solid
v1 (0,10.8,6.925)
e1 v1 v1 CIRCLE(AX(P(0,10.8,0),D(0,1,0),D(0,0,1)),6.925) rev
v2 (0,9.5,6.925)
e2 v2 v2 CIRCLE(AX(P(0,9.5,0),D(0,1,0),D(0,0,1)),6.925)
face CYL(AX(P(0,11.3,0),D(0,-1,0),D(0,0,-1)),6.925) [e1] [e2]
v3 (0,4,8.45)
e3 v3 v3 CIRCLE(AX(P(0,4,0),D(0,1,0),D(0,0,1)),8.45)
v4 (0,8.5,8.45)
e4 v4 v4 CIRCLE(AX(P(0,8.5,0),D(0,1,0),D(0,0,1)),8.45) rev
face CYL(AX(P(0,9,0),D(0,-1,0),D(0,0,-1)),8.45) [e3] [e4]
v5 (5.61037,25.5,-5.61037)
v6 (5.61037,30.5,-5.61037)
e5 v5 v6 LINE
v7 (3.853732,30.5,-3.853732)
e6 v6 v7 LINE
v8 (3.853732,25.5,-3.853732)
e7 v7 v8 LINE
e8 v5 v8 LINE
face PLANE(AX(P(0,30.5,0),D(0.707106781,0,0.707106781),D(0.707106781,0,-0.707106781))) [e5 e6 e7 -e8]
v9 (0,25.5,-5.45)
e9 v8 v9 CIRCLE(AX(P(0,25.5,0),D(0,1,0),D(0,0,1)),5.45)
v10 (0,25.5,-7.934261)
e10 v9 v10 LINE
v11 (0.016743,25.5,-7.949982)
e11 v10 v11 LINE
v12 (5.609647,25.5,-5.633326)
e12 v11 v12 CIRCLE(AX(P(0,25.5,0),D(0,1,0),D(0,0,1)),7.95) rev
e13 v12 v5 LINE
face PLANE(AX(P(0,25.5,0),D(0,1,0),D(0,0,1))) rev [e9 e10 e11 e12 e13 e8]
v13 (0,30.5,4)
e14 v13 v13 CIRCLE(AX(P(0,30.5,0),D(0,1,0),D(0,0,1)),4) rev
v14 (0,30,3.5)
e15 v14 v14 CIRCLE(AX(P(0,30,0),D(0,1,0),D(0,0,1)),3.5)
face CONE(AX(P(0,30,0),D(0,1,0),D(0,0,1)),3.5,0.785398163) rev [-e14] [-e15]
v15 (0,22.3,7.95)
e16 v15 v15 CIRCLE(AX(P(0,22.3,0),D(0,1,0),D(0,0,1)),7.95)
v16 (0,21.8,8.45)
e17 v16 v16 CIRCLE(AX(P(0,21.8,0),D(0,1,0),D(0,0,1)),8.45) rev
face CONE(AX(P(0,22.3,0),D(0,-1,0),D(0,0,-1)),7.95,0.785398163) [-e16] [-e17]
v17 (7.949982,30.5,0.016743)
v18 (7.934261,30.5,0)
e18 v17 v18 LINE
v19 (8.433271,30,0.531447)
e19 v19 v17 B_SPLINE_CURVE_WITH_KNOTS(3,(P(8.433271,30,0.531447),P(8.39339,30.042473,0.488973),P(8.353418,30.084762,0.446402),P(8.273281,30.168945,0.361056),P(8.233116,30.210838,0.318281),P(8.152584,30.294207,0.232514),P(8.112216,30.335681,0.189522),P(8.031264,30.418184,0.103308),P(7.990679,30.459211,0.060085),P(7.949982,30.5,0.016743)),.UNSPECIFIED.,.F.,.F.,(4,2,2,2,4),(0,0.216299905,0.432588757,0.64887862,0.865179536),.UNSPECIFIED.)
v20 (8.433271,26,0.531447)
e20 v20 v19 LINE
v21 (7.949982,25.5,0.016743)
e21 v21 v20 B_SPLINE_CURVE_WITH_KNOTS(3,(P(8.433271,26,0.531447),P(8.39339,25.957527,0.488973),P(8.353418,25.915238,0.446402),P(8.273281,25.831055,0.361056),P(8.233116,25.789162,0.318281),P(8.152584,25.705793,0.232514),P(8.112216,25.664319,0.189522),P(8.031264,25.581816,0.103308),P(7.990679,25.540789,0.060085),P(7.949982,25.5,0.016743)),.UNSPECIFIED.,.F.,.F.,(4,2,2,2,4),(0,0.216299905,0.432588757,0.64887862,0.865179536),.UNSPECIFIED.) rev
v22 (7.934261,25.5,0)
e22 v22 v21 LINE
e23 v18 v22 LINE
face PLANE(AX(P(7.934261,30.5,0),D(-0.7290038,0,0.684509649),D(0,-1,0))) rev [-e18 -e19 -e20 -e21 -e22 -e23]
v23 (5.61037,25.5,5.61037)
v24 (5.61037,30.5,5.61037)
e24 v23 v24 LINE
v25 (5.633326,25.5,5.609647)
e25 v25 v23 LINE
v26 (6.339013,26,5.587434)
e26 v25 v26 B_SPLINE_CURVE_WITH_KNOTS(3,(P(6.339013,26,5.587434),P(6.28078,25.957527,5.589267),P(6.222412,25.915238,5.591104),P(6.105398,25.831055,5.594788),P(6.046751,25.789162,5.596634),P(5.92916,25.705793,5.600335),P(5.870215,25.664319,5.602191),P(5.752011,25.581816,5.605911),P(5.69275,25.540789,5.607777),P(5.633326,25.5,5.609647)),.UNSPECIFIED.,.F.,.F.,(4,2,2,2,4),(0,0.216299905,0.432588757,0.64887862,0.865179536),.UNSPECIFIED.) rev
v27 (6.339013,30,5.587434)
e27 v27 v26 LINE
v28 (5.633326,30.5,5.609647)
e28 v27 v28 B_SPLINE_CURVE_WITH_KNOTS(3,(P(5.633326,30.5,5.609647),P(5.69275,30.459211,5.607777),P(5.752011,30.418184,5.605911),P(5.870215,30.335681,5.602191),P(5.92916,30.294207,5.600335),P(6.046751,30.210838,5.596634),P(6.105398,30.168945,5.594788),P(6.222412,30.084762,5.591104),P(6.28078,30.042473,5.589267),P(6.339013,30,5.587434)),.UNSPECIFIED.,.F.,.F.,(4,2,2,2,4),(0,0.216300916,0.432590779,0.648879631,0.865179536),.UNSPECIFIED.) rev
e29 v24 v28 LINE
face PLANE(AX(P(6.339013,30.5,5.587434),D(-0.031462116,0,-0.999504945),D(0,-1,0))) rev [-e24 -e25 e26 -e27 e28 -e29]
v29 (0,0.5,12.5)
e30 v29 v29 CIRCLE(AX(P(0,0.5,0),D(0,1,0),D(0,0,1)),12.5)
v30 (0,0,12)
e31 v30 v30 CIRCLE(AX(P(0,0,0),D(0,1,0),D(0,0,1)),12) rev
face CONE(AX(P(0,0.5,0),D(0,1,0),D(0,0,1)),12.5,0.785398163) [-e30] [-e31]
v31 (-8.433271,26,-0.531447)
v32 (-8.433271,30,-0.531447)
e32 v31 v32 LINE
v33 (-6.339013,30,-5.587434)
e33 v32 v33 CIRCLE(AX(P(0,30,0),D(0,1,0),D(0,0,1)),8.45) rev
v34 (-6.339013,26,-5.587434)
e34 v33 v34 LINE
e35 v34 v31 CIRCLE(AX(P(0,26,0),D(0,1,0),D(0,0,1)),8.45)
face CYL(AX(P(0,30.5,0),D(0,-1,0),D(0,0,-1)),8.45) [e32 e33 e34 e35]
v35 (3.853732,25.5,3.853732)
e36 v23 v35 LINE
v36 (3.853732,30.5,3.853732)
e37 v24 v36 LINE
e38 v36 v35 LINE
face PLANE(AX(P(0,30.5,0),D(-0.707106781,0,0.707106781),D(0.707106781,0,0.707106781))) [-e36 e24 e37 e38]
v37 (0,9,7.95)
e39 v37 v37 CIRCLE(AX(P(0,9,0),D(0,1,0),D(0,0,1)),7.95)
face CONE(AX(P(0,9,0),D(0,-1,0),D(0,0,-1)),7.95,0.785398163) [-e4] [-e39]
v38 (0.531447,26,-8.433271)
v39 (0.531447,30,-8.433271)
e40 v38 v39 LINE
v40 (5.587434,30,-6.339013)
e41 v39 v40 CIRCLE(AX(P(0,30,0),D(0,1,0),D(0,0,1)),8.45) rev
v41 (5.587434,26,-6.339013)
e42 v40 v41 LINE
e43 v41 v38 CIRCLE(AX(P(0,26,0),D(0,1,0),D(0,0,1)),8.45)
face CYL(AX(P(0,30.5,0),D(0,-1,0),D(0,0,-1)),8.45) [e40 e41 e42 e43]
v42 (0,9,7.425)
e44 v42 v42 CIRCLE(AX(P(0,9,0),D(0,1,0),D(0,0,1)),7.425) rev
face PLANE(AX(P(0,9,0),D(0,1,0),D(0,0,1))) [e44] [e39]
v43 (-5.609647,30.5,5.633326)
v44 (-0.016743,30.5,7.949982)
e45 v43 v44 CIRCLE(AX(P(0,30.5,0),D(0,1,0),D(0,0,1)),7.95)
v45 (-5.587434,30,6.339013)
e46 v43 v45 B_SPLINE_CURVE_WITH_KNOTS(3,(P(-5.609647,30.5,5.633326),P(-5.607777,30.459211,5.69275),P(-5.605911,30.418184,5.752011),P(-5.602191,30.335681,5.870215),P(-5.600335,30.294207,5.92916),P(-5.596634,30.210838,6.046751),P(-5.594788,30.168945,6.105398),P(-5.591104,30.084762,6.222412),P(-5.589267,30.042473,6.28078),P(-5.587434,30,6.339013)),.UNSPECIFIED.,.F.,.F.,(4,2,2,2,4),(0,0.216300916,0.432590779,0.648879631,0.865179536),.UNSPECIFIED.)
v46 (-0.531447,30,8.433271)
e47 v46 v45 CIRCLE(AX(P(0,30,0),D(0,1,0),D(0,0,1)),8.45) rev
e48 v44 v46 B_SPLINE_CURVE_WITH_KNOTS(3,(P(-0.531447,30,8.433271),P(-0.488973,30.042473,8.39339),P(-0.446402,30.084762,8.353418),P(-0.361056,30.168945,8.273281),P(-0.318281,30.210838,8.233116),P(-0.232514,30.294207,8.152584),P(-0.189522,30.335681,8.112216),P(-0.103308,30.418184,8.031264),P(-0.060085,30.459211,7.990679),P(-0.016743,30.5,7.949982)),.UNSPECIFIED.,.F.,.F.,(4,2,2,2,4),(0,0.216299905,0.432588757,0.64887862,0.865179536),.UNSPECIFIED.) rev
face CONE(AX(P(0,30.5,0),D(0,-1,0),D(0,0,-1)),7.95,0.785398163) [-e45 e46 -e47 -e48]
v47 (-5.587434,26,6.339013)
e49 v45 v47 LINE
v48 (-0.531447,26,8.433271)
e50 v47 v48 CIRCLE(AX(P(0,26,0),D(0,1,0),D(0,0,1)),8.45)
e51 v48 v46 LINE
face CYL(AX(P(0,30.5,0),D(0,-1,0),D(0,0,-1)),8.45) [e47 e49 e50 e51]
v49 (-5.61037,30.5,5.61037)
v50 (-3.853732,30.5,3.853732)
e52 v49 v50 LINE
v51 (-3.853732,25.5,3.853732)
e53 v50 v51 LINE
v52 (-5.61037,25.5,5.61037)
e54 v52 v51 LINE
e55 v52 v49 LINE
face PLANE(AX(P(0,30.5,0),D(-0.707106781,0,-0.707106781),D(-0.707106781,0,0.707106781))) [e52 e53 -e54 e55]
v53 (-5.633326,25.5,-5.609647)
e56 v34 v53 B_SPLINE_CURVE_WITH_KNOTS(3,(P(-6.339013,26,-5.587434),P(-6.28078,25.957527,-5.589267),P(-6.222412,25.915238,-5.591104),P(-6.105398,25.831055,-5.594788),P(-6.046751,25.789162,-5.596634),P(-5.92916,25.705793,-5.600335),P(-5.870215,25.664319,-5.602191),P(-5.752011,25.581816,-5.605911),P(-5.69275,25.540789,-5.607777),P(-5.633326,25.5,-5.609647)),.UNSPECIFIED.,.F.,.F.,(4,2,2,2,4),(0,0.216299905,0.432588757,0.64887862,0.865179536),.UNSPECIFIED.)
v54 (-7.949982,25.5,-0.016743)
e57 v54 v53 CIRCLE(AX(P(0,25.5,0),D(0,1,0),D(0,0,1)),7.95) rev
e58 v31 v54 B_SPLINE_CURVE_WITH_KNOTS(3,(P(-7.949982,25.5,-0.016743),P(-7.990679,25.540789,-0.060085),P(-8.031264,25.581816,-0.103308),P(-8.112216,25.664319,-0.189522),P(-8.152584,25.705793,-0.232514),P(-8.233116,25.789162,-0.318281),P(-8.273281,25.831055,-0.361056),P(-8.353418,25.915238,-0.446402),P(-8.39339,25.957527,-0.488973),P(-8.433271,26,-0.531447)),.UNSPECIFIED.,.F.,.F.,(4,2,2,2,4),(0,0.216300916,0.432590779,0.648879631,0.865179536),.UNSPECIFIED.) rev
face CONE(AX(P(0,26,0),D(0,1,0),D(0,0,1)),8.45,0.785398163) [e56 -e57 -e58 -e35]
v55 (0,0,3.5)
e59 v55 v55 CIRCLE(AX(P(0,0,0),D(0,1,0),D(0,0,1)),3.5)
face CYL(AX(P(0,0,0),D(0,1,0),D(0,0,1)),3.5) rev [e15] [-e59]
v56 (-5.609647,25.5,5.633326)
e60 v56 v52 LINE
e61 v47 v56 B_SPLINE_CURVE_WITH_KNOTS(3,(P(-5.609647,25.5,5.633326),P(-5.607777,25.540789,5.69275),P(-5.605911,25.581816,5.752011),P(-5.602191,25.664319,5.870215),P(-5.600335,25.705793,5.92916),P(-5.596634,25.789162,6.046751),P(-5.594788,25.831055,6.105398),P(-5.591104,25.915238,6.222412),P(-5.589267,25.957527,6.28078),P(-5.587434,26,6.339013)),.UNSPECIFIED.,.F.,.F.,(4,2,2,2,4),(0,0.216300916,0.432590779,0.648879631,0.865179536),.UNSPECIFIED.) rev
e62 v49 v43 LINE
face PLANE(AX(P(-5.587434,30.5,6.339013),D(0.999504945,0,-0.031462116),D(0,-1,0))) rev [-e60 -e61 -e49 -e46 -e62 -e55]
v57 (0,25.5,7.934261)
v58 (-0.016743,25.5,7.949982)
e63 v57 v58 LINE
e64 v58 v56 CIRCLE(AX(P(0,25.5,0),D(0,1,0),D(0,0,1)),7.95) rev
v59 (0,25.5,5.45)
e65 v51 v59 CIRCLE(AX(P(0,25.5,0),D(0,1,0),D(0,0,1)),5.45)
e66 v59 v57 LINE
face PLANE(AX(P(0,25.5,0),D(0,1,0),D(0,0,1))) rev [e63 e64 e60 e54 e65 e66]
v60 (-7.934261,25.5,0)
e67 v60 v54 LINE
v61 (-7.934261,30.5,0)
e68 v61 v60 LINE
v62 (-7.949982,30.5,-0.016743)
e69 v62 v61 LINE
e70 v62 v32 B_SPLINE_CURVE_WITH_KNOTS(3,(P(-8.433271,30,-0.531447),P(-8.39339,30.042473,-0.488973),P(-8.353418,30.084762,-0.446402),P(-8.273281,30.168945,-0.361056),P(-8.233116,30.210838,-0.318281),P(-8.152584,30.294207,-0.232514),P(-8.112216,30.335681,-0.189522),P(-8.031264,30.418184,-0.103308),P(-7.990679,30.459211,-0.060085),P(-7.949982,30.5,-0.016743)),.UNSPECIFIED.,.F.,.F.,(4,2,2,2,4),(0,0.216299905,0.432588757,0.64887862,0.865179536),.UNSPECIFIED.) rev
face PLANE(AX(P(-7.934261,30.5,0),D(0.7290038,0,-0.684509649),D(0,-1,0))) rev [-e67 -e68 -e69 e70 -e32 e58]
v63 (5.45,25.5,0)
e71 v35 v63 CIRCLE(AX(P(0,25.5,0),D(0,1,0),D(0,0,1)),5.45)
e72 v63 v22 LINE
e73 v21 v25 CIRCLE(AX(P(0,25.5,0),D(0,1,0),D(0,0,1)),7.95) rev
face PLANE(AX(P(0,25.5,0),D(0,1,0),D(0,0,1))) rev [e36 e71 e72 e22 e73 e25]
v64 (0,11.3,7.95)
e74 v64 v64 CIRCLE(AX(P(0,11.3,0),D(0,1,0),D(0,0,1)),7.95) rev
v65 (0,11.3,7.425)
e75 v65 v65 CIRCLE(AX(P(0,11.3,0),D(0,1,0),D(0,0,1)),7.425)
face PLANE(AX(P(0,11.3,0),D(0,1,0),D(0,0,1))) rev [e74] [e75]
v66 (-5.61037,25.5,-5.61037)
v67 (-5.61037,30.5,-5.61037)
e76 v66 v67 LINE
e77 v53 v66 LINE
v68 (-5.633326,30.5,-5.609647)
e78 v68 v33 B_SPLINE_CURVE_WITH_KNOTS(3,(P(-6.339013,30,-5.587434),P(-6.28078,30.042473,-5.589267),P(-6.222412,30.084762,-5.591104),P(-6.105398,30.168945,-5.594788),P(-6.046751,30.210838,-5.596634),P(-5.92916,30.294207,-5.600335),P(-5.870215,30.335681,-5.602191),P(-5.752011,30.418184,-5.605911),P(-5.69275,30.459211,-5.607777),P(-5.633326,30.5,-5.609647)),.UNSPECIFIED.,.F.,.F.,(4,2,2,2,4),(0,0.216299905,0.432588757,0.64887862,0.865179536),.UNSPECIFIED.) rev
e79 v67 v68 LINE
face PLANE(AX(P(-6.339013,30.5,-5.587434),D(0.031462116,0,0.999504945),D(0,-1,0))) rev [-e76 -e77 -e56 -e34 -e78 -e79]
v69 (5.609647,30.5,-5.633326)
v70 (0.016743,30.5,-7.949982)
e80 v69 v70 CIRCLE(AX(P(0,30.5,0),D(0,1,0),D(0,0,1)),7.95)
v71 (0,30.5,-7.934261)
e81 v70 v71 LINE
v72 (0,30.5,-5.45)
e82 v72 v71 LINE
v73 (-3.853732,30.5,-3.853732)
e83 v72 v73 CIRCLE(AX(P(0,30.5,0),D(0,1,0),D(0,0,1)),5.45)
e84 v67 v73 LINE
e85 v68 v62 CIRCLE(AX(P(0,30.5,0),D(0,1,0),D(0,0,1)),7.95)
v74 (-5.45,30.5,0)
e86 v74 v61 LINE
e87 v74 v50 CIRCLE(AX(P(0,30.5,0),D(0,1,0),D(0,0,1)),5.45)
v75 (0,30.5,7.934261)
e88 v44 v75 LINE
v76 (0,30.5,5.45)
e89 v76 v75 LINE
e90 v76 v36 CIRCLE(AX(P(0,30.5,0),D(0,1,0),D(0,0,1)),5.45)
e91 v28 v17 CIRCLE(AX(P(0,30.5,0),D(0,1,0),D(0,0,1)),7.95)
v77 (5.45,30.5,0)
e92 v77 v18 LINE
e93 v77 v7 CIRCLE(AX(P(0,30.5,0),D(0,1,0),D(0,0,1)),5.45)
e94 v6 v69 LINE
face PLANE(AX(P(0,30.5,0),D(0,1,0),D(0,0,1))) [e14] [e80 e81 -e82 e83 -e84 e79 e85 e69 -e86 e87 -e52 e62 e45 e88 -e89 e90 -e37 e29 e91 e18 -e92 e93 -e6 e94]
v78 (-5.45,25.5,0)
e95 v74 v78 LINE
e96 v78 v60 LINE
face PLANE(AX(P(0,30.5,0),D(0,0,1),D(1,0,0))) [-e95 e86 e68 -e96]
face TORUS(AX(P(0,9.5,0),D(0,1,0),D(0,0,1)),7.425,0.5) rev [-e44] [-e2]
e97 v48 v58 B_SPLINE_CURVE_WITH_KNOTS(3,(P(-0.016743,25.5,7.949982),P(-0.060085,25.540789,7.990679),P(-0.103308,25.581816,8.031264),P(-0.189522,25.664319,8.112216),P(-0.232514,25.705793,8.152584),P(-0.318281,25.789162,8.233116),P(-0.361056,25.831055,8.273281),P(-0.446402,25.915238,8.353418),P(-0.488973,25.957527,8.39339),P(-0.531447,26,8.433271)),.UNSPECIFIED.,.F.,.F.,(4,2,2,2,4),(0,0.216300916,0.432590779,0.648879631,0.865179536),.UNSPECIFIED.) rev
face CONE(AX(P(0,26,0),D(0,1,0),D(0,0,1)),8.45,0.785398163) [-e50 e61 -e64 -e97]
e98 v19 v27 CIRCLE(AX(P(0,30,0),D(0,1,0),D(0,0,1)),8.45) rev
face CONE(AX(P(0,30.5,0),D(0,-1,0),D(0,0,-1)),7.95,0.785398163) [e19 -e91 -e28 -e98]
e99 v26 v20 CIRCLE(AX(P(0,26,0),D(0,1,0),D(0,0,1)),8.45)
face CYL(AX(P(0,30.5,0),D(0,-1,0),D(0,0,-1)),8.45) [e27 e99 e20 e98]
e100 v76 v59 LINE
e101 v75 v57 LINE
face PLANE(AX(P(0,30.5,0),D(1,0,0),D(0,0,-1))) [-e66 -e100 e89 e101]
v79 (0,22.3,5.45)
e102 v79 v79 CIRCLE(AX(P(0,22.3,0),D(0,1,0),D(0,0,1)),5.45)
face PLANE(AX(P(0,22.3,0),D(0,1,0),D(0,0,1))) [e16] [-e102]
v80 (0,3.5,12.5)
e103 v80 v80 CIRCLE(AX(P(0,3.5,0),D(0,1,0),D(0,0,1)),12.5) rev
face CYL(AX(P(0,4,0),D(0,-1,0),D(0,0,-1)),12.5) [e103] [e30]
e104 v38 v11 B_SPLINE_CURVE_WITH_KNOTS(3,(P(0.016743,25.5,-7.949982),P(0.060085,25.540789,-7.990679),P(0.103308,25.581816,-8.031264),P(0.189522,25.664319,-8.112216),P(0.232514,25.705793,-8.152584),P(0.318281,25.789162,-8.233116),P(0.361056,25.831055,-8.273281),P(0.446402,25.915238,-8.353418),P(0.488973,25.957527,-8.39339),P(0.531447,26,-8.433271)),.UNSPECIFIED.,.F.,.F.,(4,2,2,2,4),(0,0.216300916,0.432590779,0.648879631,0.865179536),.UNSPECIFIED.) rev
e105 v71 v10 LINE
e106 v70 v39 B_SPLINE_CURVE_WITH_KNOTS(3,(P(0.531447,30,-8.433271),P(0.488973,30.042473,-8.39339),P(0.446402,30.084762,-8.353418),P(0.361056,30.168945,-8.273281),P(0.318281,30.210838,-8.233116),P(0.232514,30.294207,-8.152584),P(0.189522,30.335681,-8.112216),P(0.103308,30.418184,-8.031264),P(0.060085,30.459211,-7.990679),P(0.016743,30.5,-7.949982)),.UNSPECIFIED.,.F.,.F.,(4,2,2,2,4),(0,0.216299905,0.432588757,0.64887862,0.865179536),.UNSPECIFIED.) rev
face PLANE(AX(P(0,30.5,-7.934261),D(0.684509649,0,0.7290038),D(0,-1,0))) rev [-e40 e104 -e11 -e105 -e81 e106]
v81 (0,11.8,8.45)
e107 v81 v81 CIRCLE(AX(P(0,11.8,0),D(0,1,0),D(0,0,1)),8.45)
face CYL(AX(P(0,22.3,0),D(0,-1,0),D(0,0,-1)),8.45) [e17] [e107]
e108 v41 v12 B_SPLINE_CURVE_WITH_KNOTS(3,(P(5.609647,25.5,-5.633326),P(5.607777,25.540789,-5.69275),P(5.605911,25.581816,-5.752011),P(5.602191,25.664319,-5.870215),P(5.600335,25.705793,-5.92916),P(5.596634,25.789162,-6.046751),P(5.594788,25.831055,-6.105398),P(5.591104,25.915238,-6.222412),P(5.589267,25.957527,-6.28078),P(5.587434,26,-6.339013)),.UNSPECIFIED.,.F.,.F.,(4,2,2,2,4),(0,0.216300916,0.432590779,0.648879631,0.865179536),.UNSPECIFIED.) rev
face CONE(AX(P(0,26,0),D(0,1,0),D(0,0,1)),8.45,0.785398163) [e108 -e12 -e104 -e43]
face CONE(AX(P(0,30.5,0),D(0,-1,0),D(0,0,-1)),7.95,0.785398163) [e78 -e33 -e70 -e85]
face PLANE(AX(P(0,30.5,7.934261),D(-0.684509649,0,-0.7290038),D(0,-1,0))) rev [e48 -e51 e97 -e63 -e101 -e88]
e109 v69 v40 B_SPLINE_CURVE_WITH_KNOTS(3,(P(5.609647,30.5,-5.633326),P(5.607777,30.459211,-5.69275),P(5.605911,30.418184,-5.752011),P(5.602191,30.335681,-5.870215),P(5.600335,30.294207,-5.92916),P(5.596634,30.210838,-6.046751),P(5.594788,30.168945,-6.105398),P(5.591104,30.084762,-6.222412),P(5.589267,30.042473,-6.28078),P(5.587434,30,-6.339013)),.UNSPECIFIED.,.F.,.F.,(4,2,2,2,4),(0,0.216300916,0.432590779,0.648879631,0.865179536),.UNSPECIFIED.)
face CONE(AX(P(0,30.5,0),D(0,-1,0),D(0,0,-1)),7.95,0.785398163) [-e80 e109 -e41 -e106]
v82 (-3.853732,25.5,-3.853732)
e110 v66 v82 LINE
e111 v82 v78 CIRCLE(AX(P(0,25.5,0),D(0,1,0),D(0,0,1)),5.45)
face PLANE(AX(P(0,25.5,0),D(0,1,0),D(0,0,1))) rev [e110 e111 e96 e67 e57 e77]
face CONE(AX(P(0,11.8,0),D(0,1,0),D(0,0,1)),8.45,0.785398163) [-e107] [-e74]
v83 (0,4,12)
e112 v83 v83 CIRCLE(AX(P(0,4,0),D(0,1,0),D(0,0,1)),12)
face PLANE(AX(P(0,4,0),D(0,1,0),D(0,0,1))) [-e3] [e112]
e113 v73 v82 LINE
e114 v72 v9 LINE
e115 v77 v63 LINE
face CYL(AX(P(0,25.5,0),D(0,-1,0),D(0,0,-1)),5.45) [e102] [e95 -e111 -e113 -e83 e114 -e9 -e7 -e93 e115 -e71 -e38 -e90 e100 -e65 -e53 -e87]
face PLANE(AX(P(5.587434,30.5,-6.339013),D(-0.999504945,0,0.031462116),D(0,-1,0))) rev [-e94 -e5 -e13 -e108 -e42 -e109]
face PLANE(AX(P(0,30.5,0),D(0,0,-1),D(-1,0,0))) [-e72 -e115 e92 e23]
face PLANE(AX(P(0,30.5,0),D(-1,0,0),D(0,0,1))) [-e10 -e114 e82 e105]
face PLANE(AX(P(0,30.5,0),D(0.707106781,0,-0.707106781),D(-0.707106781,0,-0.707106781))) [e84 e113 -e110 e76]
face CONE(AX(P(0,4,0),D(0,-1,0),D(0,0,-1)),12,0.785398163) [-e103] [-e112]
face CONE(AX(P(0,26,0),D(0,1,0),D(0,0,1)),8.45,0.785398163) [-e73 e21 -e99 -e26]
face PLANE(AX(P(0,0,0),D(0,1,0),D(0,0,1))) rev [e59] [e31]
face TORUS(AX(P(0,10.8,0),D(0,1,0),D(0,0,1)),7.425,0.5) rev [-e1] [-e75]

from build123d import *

# Parameters (mm, degrees)
SKETCH1_R           = 12.5
BOSS_EXTRUDE1_DEPTH = 4
SKETCH2_R           = 8.45
BOSS_EXTRUDE2_DEPTH = 5
SKETCH3_R           = 6.925
BOSS_EXTRUDE3_DEPTH = 2.3
SKETCH4_R           = 8.45
BOSS_EXTRUDE4_DEPTH = 11
SKETCH5_R           = 5.45
BOSS_EXTRUDE5_DEPTH = 3.2
SKETCH6_R           = 5.45
BOSS_EXTRUDE7_DEPTH = 5
SKETCH7_R           = 3.5
CUT_EXTRUDE1_DEPTH  = 36.252659474
CHAMFER1_START      = 25.5
CHAMFER1_2_DEPTH    = 5.5
FILLET1_R           = 0.5


with BuildPart() as part:
    # Sketch1 → Boss-Extrude1 (new body)
    with BuildSketch(Plane(origin=(0, 0, 0), x_dir=(1, 0, 0), z_dir=(0, 1, 0))):
        with Locations(Location((0, 0, 0), (0, 0, 270))):
            Circle(SKETCH1_R)
    extrude(amount=BOSS_EXTRUDE1_DEPTH)

    # Sketch2 → Boss-Extrude2 (add)
    with BuildSketch(Plane(origin=(0, 4, 0), x_dir=(1, 0, 0), z_dir=(0, 1, 0))):
        with Locations(Location((0, 0, 0), (0, 0, 270))):
            Circle(SKETCH2_R)
    extrude(amount=BOSS_EXTRUDE2_DEPTH)

    # Sketch3 → Boss-Extrude3 (add)
    with BuildSketch(Plane(origin=(0, 9, 0), x_dir=(1, 0, 0), z_dir=(0, 1, 0))):
        with Locations(Location((0, 0, 0), (0, 0, 270))):
            Circle(SKETCH3_R)
    extrude(amount=BOSS_EXTRUDE3_DEPTH)

    # Sketch4 → Boss-Extrude4 (add)
    with BuildSketch(Plane(origin=(0, 11.3, 0), x_dir=(1, 0, 0), z_dir=(0, 1, 0))):
        with Locations(Location((0, 0, 0), (0, 0, 270))):
            Circle(SKETCH4_R)
    extrude(amount=BOSS_EXTRUDE4_DEPTH)

    # Sketch5 → Boss-Extrude5 (add)
    with BuildSketch(Plane(origin=(0, 22.3, 0), x_dir=(1, 0, 0), z_dir=(0, 1, 0))):
        with Locations(Location((0, 0, 0), (0, 0, 270))):
            Circle(SKETCH5_R)
    extrude(amount=BOSS_EXTRUDE5_DEPTH)

    # Sketch6 → Boss-Extrude7 (add)
    with BuildSketch(Plane(origin=(0, 25.5, 0), x_dir=(1, 0, 0), z_dir=(0, 1, 0))):
        with Locations(Location((0, 0, 0), (0, 0, 270))):
            Circle(SKETCH6_R)
        with BuildLine():
            Line((-8.45, 0), (-5.45, 0))
            ThreePointArc((-5.45, 0), (-5.035143452, 2.085624706), (-3.853731957, 3.853731957))
            Line((-3.853731957, 3.853731957), (-5.975052301, 5.975052301))
            ThreePointArc((-5.975052301, 5.975052301), (-7.80678205, 3.233675003), (-8.45, 0))
        make_face()
        with BuildLine():
            ThreePointArc((0, -5.45), (-2.085624706, -5.035143452), (-3.853731957, -3.853731957))
            Line((-3.853731957, -3.853731957), (-5.975052301, -5.975052301))
            ThreePointArc((-5.975052301, -5.975052301), (-3.233675003, -7.80678205), (0, -8.45))
            Line((0, -8.45), (0, -5.45))
        make_face()
        with BuildLine():
            ThreePointArc((5.45, 0), (5.035143452, -2.085624706), (3.853731957, -3.853731957))
            Line((3.853731957, -3.853731957), (5.975052301, -5.975052301))
            ThreePointArc((5.975052301, -5.975052301), (7.80678205, -3.233675003), (8.45, 0))
            Line((8.45, 0), (5.45, 0))
        make_face()
        with BuildLine():
            Line((0, 8.45), (0, 5.45))
            ThreePointArc((0, 5.45), (2.085624706, 5.035143452), (3.853731957, 3.853731957))
            Line((3.853731957, 3.853731957), (5.975052301, 5.975052301))
            ThreePointArc((5.975052301, 5.975052301), (3.233675003, 7.80678205), (0, 8.45))
        make_face()
    extrude(amount=BOSS_EXTRUDE7_DEPTH)

    # Sketch7 → Cut-Extrude1 (cut, through all)
    with BuildSketch(Plane(origin=(0, 30.5, 0), x_dir=(1, 0, 0), z_dir=(0, 1, 0))):
        with Locations(Location((0, 0, 0), (0, 0, 270))):
            Circle(SKETCH7_R)
    extrude(amount=-CUT_EXTRUDE1_DEPTH, mode=Mode.SUBTRACT)

    # Chamfer1: read off the stored shape, not the designer's step
    # Chamfer1 outline → Chamfer1 (revolve, cut)
    with BuildSketch(Plane.XY):
        Polygon((12.5, 0.5), (12, 0), (12.5, 0), align=None)
        Polygon((12, 4), (12.5, 3.5), (12.5, 4), align=None)
        Polygon((7.95, 9), (8.45, 8.5), (8.45, 9), align=None)
        Polygon((7.95, 11.3), (8.45, 11.3), (8.45, 11.8), align=None)
        Polygon((7.95, 22.3), (8.45, 21.8), (8.45, 22.3), align=None)
        Polygon((7.95, 30.5), (8.45, 30), (8.45, 30.5), align=None)
        Polygon((3.5, 30), (4, 30.5), (3.5, 30.5), align=None)
    revolve(axis=Axis((0, 0, 0), (0, 1, 0)), mode=Mode.SUBTRACT)

    # Chamfer1 2 outline → Chamfer1 2 (cut)
    with BuildSketch(Plane(origin=(0, 0, 0), x_dir=(1, 0, 0), z_dir=(0, 1, 0)).offset(CHAMFER1_START)):
        with BuildLine():
            Line((8.45, 0), (7.93426115, 0))
            Line((7.93426115, 0), (8.433271285, -0.531446541))
            ThreePointArc((8.433271285, -0.531446541), (8.445816786, -0.265854883), (8.45, 0))
        make_face()
        with BuildLine():
            ThreePointArc((5.975052301, -5.975052301), (6.160082112, -5.784106531), (6.339012766, -5.587433861))
            Line((6.339012766, -5.587433861), (5.610369863, -5.610369863))
            Line((5.610369863, -5.610369863), (5.975052301, -5.975052301))
        make_face()
        with BuildLine():
            ThreePointArc((5.975052301, 5.975052301), (5.784106531, 6.160082112), (5.587433861, 6.339012766))
            Line((5.587433861, 6.339012766), (5.610369863, 5.610369863))
            Line((5.610369863, 5.610369863), (5.975052301, 5.975052301))
        make_face()
        with BuildLine():
            Line((0, 7.93426115), (0.531446541, 8.433271285))
            ThreePointArc((0.531446541, 8.433271285), (0.265854883, 8.445816786), (0, 8.45))
            Line((0, 8.45), (0, 7.93426115))
        make_face()
        with BuildLine():
            ThreePointArc((-5.975052301, -5.975052301), (-5.784106531, -6.160082112), (-5.587433861, -6.339012766))
            Line((-5.587433861, -6.339012766), (-5.610369863, -5.610369863))
            Line((-5.610369863, -5.610369863), (-5.975052301, -5.975052301))
        make_face()
        with BuildLine():
            Line((0, -7.93426115), (-0.531446541, -8.433271285))
            ThreePointArc((-0.531446541, -8.433271285), (-0.265854883, -8.445816786), (0, -8.45))
            Line((0, -8.45), (0, -7.93426115))
        make_face()
        with BuildLine():
            ThreePointArc((-5.975052301, 5.975052301), (-6.160082112, 5.784106531), (-6.339012766, 5.587433861))
            Line((-6.339012766, 5.587433861), (-5.610369863, 5.610369863))
            Line((-5.610369863, 5.610369863), (-5.975052301, 5.975052301))
        make_face()
        with BuildLine():
            Line((-7.93426115, 0), (-8.433271285, 0.531446541))
            ThreePointArc((-8.433271285, 0.531446541), (-8.445816786, 0.265854883), (-8.45, 0))
            Line((-8.45, 0), (-7.93426115, 0))
        make_face()
    extrude(amount=CHAMFER1_2_DEPTH, mode=Mode.SUBTRACT)

    # Chamfer1 3 outline → Chamfer1 3 (revolve, cut)
    with BuildSketch(Plane.XY):
        Polygon((8.45, 26), (7.95, 25.5), (8.45, 25.5), align=None)
    revolve(axis=Axis((0, 0, 0), (0, 1, 0)), mode=Mode.SUBTRACT)

    # Fillet1
    fillet1_edges = [part.edges().sort_by_distance(p)[0] for p in [
        (0, 11.3, -6.925),
        (0, 9, -6.925),
    ]]
    fillet(fillet1_edges, radius=FILLET1_R)


solid = part.part
